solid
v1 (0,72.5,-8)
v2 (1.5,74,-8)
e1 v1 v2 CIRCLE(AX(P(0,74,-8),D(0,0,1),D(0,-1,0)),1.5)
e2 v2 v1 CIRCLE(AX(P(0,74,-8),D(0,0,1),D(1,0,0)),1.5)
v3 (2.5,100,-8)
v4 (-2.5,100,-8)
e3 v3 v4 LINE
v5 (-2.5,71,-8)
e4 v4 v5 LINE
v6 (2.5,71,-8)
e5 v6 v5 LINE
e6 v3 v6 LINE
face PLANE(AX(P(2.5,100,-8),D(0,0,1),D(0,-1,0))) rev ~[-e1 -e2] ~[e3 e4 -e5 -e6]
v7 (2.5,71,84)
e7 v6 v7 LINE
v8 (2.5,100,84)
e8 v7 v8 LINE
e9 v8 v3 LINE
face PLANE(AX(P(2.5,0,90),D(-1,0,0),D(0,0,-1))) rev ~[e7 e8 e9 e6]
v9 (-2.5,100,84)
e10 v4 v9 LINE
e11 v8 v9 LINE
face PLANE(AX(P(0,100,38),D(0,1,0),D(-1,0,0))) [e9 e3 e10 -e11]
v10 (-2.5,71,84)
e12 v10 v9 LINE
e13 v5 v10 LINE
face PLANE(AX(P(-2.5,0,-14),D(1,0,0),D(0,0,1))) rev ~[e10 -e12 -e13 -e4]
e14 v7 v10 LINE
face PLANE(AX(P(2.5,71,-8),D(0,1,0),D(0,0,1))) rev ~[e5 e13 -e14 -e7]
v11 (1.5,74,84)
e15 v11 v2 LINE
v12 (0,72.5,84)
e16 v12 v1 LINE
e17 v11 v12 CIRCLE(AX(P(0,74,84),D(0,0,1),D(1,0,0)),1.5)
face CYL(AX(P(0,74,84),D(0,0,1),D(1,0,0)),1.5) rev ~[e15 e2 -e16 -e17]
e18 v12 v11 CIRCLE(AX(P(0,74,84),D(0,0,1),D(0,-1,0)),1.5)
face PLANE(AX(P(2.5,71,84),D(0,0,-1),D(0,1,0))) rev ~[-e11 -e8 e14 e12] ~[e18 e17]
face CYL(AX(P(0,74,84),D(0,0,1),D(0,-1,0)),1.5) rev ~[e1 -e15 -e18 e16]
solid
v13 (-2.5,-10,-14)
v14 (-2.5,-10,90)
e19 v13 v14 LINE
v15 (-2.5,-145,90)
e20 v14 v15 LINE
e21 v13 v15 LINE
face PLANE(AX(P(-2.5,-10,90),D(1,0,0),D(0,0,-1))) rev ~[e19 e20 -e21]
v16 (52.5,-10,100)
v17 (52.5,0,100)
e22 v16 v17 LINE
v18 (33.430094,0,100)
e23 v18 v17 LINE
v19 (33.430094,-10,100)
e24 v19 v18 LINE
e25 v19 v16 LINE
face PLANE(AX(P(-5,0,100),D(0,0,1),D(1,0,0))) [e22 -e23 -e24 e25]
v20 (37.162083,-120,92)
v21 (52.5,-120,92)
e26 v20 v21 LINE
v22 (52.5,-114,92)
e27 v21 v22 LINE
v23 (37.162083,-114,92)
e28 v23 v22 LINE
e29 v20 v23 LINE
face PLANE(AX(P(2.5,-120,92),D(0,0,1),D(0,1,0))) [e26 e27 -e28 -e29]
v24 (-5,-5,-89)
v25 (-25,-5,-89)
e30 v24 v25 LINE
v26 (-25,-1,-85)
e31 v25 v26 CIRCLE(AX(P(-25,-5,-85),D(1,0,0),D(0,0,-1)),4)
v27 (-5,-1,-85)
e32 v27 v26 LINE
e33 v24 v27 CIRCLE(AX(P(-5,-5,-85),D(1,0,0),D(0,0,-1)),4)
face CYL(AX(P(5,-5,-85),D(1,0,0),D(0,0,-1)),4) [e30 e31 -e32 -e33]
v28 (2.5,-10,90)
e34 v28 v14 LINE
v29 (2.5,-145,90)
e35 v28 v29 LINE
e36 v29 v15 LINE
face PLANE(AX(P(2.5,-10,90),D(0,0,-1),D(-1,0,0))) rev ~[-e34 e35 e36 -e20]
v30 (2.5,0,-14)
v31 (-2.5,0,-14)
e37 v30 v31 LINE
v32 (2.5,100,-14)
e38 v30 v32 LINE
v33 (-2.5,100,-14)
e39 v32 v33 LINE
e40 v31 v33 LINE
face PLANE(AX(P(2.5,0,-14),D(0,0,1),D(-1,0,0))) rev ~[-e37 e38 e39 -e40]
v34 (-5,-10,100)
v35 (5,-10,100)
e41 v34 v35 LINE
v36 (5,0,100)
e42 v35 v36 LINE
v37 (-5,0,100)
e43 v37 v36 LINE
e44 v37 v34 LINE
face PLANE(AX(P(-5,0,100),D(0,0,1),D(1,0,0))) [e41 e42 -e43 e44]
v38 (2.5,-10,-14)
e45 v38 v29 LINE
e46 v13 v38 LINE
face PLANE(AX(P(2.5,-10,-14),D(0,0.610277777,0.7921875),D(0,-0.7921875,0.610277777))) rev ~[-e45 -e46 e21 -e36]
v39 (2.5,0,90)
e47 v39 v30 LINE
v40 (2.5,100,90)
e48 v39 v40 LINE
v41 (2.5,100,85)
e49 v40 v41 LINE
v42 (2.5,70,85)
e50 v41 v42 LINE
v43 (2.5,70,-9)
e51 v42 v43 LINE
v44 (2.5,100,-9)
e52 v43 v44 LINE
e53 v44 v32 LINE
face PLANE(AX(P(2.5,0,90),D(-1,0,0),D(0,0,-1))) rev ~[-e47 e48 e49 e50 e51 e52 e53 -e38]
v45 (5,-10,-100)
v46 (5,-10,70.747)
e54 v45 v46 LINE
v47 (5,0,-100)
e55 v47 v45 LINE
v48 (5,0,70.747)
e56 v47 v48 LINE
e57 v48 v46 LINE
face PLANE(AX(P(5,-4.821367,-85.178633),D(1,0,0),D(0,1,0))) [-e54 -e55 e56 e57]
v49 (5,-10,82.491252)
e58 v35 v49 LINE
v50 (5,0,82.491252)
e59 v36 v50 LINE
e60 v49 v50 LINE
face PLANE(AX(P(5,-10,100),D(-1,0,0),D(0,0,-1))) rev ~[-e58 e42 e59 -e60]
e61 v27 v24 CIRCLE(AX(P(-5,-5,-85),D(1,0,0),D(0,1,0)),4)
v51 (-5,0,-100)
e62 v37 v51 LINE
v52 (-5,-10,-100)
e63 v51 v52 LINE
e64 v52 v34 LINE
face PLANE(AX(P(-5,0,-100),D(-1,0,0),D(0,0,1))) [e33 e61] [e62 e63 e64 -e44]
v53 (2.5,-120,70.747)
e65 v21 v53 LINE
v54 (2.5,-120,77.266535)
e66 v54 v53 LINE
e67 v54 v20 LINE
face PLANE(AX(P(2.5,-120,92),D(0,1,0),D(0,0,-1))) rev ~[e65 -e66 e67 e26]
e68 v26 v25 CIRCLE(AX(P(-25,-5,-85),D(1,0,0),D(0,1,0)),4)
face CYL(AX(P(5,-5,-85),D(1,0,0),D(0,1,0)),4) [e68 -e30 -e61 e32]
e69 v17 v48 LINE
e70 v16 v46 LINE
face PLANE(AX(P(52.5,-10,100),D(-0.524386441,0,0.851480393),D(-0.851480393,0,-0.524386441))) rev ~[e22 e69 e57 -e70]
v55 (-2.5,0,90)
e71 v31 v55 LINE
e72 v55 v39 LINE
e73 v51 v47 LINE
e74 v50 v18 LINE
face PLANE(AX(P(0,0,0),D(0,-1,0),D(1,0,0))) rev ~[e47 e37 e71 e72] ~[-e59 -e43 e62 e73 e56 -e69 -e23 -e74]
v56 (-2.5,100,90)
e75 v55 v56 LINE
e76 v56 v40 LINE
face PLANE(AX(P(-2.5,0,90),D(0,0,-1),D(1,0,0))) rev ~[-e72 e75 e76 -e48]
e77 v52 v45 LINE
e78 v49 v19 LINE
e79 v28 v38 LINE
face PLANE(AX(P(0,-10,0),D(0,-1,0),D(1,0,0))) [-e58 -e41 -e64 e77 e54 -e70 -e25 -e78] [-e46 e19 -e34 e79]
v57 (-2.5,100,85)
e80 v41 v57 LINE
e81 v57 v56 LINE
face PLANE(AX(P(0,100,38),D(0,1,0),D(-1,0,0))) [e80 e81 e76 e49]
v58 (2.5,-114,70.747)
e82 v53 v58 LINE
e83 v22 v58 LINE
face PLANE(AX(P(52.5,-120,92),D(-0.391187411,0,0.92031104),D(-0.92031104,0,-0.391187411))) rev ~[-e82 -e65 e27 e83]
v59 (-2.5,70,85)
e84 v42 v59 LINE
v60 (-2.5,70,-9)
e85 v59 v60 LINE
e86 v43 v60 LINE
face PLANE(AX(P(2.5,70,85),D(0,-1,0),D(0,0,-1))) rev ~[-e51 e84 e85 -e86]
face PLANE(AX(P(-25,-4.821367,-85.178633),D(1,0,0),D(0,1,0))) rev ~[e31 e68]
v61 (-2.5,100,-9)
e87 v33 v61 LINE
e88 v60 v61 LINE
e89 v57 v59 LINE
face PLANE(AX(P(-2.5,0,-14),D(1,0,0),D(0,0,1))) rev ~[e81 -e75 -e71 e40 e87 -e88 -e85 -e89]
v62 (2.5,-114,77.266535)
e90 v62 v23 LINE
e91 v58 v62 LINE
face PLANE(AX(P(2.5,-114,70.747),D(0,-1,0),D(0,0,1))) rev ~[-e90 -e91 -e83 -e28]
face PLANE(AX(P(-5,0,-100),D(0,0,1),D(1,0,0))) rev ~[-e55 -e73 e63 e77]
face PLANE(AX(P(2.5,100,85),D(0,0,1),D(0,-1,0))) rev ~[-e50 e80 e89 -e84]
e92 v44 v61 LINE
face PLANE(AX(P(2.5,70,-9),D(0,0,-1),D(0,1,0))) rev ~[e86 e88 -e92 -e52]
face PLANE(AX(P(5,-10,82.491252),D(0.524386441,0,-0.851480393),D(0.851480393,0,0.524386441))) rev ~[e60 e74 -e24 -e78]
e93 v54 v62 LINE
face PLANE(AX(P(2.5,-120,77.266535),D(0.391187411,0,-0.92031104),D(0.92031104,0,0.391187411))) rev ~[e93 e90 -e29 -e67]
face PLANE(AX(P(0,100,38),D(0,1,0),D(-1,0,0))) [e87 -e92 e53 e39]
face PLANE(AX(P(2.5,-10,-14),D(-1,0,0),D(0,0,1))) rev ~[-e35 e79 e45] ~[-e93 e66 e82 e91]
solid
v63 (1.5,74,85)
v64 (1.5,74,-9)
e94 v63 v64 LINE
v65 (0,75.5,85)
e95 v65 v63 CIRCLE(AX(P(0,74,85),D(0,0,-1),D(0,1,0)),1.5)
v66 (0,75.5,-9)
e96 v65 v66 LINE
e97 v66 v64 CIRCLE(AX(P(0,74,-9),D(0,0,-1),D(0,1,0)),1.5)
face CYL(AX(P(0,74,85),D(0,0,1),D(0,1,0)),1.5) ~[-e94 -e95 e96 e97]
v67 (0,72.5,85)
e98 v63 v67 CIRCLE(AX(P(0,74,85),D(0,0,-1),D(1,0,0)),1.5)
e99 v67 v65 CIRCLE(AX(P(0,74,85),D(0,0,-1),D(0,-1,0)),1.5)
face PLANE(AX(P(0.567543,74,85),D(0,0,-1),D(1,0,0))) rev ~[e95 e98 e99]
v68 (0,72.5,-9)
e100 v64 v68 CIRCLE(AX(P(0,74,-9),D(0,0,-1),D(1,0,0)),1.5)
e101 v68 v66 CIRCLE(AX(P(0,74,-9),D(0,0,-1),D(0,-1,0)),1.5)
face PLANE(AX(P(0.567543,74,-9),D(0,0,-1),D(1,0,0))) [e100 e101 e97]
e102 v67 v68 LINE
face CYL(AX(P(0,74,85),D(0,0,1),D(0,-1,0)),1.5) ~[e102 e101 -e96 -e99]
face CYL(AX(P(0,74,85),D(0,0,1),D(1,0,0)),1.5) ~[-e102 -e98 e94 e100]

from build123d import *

# Parameters (mm, degrees)
F0_W      = 10
F0_H      = 200
F1_DEPTH  = 10
F3_DEPTH  = 135
F5_DEPTH  = 7.501
F6_W      = 5
F6_H      = 10
F6_H_2    = 9.253
F7_DEPTH  = 57.5
F9_DEPTH  = 30
F11_DEPTH = 100
F13_DEPTH = 5
F15_DEPTH = 92
F17_DEPTH = 94
F19_DEPTH = 25
F20_W     = 6
F20_H     = 6
F20_H_2   = 7.253
F20_H_3   = 2
F21_DEPTH = 50
F23_DEPTH = 25


# Not quite as in the source:
# - a feature names something its author has since deleted; it is built from what else it names


with BuildPart() as f1:
    # F0 (on Front) → F1 (new body)
    with BuildSketch(Plane.XZ):
        Rectangle(F0_W, F0_H)
    extrude(amount=F1_DEPTH)

    # F2 (on face) → F3 (join)
    with BuildSketch(Plane.XZ.offset(10)):
        Polygon((2.5, 90), (0, 90), (-2.5, 90), (-2.5, -14), (0, -14), (2.5, -14), align=None)
    extrude(amount=F3_DEPTH)

    # F4 (on face) → F5 (cut, through all)
    with BuildSketch(Plane.YZ.offset(2.5)):
        Polygon((-10, -14), (-145, 90), (-145, -14), align=None)
    extrude(amount=-F5_DEPTH, mode=Mode.SUBTRACT)

    # F6 (on face) → F7 (join)
    with BuildSketch(Plane(origin=(-5, 0, 0), x_dir=(0, -1, 0), z_dir=(-1, 0, 0))):
        with Locations((7.5, 75.747)):
            Rectangle(F6_W, F6_H)
        with Locations((2.5, 75.747)):
            Rectangle(F6_W, F6_H)
        with Locations((2.5, 85.3735)):
            Rectangle(F6_W, F6_H_2)
        with Locations((7.5, 85.3735)):
            Rectangle(F6_W, F6_H_2)
        with Locations((2.5, 95)):
            Rectangle(F6_W, F6_H)
        with Locations((7.5, 95)):
            Rectangle(F6_W, F6_H)
    extrude(amount=-F7_DEPTH)

    # F8 (on face) → F9 (join)
    with BuildSketch(Plane.YZ.offset(5)):
        with BuildLine():
            ThreePointArc((-1, -85), (-7.8284271247, -82.1715728753), (-5, -89))
            ThreePointArc((-5, -89), (-2.1715728753, -87.8284271247), (-1, -85))
        make_face()
    extrude(amount=-F9_DEPTH)

    # F10 (on face) → F11 (join)
    with BuildSketch(Plane(origin=(0, 0, 0), x_dir=(-1, 0, 0), z_dir=(0, 1, 0))):
        Polygon((2.5, 90), (0, 90), (-2.5, 90), (-2.5, -14), (2.5, -14), align=None)
    extrude(amount=F11_DEPTH)

    # F12 (on face) → F13 (cut, through all)
    with BuildSketch(Plane.YZ.offset(2.5)):
        Polygon((100, 84), (100, 85), (70, 85), (70, -9), (100, -9), (100, -8), (71, -8), (71, 84), align=None)
    extrude(amount=-F13_DEPTH, mode=Mode.SUBTRACT)

    # F14 (on face) → F15 (cut, through all)
    with BuildSketch(Plane.XY.offset(84)):
        with BuildLine():
            ThreePointArc((0, 72.5), (1.0606601718, 72.9393398282), (1.5, 74))
            ThreePointArc((1.5, 74), (-1.0606601718, 75.0606601718), (0, 72.5))
        make_face()
    extrude(amount=-F15_DEPTH, mode=Mode.SUBTRACT)

    # F18 (on face) → F19 (cut)
    with BuildSketch(Plane.XZ.offset(10)):
        Polygon((5, 100), (5, 82.4912516314), (33.4300942641, 100), align=None)
        Polygon((52.5, 100), (5, 70.747), (52.5, 70.747), align=None)
    extrude(amount=-F19_DEPTH, mode=Mode.SUBTRACT)

    # F20 (on face) → F21 (join)
    with BuildSketch(Plane.YZ.offset(2.5)):
        with Locations((-117, 73.747)):
            Rectangle(F20_W, F20_H)
        with Locations((-117, 80.3735)):
            Rectangle(F20_W, F20_H_2)
        with Locations((-117, 87)):
            Rectangle(F20_W, F20_H)
        with Locations((-117, 91)):
            Rectangle(F20_W, F20_H_3)
    extrude(amount=F21_DEPTH)

    # F22 (on face) → F23 (cut)
    with BuildSketch(Plane.XZ.offset(120)):
        Polygon((2.5, 90), (2.5, 77.2665349627), (37.1620830878, 92), (2.5, 92), align=None)
        Polygon((52.5, 92), (2.5, 70.747), (52.5, 70.747), align=None)
    extrude(amount=-F23_DEPTH, mode=Mode.SUBTRACT)


with BuildPart() as f17:
    # F16 (on face) → F17 (new body, through all)
    with BuildSketch(Plane(origin=(0, 0, 85), x_dir=(1, 0, 0), z_dir=(0, 0, -1))):
        with BuildLine():
            ThreePointArc((1.5, -74), (1.0606601718, -72.9393398282), (0, -72.5))
            Line((0, -72.5), (0, -74))
            Line((0, -74), (0, -75.5))
            ThreePointArc((0, -75.5), (1.0606601718, -75.0606601718), (1.5, -74))
        make_face()
        with BuildLine():
            Line((0, -74), (0, -72.5))
            ThreePointArc((0, -72.5), (-1.5, -74), (0, -75.5))
            Line((0, -75.5), (0, -74))
        make_face()
    extrude(amount=F17_DEPTH)


solid = Compound([f1.part, f17.part])
